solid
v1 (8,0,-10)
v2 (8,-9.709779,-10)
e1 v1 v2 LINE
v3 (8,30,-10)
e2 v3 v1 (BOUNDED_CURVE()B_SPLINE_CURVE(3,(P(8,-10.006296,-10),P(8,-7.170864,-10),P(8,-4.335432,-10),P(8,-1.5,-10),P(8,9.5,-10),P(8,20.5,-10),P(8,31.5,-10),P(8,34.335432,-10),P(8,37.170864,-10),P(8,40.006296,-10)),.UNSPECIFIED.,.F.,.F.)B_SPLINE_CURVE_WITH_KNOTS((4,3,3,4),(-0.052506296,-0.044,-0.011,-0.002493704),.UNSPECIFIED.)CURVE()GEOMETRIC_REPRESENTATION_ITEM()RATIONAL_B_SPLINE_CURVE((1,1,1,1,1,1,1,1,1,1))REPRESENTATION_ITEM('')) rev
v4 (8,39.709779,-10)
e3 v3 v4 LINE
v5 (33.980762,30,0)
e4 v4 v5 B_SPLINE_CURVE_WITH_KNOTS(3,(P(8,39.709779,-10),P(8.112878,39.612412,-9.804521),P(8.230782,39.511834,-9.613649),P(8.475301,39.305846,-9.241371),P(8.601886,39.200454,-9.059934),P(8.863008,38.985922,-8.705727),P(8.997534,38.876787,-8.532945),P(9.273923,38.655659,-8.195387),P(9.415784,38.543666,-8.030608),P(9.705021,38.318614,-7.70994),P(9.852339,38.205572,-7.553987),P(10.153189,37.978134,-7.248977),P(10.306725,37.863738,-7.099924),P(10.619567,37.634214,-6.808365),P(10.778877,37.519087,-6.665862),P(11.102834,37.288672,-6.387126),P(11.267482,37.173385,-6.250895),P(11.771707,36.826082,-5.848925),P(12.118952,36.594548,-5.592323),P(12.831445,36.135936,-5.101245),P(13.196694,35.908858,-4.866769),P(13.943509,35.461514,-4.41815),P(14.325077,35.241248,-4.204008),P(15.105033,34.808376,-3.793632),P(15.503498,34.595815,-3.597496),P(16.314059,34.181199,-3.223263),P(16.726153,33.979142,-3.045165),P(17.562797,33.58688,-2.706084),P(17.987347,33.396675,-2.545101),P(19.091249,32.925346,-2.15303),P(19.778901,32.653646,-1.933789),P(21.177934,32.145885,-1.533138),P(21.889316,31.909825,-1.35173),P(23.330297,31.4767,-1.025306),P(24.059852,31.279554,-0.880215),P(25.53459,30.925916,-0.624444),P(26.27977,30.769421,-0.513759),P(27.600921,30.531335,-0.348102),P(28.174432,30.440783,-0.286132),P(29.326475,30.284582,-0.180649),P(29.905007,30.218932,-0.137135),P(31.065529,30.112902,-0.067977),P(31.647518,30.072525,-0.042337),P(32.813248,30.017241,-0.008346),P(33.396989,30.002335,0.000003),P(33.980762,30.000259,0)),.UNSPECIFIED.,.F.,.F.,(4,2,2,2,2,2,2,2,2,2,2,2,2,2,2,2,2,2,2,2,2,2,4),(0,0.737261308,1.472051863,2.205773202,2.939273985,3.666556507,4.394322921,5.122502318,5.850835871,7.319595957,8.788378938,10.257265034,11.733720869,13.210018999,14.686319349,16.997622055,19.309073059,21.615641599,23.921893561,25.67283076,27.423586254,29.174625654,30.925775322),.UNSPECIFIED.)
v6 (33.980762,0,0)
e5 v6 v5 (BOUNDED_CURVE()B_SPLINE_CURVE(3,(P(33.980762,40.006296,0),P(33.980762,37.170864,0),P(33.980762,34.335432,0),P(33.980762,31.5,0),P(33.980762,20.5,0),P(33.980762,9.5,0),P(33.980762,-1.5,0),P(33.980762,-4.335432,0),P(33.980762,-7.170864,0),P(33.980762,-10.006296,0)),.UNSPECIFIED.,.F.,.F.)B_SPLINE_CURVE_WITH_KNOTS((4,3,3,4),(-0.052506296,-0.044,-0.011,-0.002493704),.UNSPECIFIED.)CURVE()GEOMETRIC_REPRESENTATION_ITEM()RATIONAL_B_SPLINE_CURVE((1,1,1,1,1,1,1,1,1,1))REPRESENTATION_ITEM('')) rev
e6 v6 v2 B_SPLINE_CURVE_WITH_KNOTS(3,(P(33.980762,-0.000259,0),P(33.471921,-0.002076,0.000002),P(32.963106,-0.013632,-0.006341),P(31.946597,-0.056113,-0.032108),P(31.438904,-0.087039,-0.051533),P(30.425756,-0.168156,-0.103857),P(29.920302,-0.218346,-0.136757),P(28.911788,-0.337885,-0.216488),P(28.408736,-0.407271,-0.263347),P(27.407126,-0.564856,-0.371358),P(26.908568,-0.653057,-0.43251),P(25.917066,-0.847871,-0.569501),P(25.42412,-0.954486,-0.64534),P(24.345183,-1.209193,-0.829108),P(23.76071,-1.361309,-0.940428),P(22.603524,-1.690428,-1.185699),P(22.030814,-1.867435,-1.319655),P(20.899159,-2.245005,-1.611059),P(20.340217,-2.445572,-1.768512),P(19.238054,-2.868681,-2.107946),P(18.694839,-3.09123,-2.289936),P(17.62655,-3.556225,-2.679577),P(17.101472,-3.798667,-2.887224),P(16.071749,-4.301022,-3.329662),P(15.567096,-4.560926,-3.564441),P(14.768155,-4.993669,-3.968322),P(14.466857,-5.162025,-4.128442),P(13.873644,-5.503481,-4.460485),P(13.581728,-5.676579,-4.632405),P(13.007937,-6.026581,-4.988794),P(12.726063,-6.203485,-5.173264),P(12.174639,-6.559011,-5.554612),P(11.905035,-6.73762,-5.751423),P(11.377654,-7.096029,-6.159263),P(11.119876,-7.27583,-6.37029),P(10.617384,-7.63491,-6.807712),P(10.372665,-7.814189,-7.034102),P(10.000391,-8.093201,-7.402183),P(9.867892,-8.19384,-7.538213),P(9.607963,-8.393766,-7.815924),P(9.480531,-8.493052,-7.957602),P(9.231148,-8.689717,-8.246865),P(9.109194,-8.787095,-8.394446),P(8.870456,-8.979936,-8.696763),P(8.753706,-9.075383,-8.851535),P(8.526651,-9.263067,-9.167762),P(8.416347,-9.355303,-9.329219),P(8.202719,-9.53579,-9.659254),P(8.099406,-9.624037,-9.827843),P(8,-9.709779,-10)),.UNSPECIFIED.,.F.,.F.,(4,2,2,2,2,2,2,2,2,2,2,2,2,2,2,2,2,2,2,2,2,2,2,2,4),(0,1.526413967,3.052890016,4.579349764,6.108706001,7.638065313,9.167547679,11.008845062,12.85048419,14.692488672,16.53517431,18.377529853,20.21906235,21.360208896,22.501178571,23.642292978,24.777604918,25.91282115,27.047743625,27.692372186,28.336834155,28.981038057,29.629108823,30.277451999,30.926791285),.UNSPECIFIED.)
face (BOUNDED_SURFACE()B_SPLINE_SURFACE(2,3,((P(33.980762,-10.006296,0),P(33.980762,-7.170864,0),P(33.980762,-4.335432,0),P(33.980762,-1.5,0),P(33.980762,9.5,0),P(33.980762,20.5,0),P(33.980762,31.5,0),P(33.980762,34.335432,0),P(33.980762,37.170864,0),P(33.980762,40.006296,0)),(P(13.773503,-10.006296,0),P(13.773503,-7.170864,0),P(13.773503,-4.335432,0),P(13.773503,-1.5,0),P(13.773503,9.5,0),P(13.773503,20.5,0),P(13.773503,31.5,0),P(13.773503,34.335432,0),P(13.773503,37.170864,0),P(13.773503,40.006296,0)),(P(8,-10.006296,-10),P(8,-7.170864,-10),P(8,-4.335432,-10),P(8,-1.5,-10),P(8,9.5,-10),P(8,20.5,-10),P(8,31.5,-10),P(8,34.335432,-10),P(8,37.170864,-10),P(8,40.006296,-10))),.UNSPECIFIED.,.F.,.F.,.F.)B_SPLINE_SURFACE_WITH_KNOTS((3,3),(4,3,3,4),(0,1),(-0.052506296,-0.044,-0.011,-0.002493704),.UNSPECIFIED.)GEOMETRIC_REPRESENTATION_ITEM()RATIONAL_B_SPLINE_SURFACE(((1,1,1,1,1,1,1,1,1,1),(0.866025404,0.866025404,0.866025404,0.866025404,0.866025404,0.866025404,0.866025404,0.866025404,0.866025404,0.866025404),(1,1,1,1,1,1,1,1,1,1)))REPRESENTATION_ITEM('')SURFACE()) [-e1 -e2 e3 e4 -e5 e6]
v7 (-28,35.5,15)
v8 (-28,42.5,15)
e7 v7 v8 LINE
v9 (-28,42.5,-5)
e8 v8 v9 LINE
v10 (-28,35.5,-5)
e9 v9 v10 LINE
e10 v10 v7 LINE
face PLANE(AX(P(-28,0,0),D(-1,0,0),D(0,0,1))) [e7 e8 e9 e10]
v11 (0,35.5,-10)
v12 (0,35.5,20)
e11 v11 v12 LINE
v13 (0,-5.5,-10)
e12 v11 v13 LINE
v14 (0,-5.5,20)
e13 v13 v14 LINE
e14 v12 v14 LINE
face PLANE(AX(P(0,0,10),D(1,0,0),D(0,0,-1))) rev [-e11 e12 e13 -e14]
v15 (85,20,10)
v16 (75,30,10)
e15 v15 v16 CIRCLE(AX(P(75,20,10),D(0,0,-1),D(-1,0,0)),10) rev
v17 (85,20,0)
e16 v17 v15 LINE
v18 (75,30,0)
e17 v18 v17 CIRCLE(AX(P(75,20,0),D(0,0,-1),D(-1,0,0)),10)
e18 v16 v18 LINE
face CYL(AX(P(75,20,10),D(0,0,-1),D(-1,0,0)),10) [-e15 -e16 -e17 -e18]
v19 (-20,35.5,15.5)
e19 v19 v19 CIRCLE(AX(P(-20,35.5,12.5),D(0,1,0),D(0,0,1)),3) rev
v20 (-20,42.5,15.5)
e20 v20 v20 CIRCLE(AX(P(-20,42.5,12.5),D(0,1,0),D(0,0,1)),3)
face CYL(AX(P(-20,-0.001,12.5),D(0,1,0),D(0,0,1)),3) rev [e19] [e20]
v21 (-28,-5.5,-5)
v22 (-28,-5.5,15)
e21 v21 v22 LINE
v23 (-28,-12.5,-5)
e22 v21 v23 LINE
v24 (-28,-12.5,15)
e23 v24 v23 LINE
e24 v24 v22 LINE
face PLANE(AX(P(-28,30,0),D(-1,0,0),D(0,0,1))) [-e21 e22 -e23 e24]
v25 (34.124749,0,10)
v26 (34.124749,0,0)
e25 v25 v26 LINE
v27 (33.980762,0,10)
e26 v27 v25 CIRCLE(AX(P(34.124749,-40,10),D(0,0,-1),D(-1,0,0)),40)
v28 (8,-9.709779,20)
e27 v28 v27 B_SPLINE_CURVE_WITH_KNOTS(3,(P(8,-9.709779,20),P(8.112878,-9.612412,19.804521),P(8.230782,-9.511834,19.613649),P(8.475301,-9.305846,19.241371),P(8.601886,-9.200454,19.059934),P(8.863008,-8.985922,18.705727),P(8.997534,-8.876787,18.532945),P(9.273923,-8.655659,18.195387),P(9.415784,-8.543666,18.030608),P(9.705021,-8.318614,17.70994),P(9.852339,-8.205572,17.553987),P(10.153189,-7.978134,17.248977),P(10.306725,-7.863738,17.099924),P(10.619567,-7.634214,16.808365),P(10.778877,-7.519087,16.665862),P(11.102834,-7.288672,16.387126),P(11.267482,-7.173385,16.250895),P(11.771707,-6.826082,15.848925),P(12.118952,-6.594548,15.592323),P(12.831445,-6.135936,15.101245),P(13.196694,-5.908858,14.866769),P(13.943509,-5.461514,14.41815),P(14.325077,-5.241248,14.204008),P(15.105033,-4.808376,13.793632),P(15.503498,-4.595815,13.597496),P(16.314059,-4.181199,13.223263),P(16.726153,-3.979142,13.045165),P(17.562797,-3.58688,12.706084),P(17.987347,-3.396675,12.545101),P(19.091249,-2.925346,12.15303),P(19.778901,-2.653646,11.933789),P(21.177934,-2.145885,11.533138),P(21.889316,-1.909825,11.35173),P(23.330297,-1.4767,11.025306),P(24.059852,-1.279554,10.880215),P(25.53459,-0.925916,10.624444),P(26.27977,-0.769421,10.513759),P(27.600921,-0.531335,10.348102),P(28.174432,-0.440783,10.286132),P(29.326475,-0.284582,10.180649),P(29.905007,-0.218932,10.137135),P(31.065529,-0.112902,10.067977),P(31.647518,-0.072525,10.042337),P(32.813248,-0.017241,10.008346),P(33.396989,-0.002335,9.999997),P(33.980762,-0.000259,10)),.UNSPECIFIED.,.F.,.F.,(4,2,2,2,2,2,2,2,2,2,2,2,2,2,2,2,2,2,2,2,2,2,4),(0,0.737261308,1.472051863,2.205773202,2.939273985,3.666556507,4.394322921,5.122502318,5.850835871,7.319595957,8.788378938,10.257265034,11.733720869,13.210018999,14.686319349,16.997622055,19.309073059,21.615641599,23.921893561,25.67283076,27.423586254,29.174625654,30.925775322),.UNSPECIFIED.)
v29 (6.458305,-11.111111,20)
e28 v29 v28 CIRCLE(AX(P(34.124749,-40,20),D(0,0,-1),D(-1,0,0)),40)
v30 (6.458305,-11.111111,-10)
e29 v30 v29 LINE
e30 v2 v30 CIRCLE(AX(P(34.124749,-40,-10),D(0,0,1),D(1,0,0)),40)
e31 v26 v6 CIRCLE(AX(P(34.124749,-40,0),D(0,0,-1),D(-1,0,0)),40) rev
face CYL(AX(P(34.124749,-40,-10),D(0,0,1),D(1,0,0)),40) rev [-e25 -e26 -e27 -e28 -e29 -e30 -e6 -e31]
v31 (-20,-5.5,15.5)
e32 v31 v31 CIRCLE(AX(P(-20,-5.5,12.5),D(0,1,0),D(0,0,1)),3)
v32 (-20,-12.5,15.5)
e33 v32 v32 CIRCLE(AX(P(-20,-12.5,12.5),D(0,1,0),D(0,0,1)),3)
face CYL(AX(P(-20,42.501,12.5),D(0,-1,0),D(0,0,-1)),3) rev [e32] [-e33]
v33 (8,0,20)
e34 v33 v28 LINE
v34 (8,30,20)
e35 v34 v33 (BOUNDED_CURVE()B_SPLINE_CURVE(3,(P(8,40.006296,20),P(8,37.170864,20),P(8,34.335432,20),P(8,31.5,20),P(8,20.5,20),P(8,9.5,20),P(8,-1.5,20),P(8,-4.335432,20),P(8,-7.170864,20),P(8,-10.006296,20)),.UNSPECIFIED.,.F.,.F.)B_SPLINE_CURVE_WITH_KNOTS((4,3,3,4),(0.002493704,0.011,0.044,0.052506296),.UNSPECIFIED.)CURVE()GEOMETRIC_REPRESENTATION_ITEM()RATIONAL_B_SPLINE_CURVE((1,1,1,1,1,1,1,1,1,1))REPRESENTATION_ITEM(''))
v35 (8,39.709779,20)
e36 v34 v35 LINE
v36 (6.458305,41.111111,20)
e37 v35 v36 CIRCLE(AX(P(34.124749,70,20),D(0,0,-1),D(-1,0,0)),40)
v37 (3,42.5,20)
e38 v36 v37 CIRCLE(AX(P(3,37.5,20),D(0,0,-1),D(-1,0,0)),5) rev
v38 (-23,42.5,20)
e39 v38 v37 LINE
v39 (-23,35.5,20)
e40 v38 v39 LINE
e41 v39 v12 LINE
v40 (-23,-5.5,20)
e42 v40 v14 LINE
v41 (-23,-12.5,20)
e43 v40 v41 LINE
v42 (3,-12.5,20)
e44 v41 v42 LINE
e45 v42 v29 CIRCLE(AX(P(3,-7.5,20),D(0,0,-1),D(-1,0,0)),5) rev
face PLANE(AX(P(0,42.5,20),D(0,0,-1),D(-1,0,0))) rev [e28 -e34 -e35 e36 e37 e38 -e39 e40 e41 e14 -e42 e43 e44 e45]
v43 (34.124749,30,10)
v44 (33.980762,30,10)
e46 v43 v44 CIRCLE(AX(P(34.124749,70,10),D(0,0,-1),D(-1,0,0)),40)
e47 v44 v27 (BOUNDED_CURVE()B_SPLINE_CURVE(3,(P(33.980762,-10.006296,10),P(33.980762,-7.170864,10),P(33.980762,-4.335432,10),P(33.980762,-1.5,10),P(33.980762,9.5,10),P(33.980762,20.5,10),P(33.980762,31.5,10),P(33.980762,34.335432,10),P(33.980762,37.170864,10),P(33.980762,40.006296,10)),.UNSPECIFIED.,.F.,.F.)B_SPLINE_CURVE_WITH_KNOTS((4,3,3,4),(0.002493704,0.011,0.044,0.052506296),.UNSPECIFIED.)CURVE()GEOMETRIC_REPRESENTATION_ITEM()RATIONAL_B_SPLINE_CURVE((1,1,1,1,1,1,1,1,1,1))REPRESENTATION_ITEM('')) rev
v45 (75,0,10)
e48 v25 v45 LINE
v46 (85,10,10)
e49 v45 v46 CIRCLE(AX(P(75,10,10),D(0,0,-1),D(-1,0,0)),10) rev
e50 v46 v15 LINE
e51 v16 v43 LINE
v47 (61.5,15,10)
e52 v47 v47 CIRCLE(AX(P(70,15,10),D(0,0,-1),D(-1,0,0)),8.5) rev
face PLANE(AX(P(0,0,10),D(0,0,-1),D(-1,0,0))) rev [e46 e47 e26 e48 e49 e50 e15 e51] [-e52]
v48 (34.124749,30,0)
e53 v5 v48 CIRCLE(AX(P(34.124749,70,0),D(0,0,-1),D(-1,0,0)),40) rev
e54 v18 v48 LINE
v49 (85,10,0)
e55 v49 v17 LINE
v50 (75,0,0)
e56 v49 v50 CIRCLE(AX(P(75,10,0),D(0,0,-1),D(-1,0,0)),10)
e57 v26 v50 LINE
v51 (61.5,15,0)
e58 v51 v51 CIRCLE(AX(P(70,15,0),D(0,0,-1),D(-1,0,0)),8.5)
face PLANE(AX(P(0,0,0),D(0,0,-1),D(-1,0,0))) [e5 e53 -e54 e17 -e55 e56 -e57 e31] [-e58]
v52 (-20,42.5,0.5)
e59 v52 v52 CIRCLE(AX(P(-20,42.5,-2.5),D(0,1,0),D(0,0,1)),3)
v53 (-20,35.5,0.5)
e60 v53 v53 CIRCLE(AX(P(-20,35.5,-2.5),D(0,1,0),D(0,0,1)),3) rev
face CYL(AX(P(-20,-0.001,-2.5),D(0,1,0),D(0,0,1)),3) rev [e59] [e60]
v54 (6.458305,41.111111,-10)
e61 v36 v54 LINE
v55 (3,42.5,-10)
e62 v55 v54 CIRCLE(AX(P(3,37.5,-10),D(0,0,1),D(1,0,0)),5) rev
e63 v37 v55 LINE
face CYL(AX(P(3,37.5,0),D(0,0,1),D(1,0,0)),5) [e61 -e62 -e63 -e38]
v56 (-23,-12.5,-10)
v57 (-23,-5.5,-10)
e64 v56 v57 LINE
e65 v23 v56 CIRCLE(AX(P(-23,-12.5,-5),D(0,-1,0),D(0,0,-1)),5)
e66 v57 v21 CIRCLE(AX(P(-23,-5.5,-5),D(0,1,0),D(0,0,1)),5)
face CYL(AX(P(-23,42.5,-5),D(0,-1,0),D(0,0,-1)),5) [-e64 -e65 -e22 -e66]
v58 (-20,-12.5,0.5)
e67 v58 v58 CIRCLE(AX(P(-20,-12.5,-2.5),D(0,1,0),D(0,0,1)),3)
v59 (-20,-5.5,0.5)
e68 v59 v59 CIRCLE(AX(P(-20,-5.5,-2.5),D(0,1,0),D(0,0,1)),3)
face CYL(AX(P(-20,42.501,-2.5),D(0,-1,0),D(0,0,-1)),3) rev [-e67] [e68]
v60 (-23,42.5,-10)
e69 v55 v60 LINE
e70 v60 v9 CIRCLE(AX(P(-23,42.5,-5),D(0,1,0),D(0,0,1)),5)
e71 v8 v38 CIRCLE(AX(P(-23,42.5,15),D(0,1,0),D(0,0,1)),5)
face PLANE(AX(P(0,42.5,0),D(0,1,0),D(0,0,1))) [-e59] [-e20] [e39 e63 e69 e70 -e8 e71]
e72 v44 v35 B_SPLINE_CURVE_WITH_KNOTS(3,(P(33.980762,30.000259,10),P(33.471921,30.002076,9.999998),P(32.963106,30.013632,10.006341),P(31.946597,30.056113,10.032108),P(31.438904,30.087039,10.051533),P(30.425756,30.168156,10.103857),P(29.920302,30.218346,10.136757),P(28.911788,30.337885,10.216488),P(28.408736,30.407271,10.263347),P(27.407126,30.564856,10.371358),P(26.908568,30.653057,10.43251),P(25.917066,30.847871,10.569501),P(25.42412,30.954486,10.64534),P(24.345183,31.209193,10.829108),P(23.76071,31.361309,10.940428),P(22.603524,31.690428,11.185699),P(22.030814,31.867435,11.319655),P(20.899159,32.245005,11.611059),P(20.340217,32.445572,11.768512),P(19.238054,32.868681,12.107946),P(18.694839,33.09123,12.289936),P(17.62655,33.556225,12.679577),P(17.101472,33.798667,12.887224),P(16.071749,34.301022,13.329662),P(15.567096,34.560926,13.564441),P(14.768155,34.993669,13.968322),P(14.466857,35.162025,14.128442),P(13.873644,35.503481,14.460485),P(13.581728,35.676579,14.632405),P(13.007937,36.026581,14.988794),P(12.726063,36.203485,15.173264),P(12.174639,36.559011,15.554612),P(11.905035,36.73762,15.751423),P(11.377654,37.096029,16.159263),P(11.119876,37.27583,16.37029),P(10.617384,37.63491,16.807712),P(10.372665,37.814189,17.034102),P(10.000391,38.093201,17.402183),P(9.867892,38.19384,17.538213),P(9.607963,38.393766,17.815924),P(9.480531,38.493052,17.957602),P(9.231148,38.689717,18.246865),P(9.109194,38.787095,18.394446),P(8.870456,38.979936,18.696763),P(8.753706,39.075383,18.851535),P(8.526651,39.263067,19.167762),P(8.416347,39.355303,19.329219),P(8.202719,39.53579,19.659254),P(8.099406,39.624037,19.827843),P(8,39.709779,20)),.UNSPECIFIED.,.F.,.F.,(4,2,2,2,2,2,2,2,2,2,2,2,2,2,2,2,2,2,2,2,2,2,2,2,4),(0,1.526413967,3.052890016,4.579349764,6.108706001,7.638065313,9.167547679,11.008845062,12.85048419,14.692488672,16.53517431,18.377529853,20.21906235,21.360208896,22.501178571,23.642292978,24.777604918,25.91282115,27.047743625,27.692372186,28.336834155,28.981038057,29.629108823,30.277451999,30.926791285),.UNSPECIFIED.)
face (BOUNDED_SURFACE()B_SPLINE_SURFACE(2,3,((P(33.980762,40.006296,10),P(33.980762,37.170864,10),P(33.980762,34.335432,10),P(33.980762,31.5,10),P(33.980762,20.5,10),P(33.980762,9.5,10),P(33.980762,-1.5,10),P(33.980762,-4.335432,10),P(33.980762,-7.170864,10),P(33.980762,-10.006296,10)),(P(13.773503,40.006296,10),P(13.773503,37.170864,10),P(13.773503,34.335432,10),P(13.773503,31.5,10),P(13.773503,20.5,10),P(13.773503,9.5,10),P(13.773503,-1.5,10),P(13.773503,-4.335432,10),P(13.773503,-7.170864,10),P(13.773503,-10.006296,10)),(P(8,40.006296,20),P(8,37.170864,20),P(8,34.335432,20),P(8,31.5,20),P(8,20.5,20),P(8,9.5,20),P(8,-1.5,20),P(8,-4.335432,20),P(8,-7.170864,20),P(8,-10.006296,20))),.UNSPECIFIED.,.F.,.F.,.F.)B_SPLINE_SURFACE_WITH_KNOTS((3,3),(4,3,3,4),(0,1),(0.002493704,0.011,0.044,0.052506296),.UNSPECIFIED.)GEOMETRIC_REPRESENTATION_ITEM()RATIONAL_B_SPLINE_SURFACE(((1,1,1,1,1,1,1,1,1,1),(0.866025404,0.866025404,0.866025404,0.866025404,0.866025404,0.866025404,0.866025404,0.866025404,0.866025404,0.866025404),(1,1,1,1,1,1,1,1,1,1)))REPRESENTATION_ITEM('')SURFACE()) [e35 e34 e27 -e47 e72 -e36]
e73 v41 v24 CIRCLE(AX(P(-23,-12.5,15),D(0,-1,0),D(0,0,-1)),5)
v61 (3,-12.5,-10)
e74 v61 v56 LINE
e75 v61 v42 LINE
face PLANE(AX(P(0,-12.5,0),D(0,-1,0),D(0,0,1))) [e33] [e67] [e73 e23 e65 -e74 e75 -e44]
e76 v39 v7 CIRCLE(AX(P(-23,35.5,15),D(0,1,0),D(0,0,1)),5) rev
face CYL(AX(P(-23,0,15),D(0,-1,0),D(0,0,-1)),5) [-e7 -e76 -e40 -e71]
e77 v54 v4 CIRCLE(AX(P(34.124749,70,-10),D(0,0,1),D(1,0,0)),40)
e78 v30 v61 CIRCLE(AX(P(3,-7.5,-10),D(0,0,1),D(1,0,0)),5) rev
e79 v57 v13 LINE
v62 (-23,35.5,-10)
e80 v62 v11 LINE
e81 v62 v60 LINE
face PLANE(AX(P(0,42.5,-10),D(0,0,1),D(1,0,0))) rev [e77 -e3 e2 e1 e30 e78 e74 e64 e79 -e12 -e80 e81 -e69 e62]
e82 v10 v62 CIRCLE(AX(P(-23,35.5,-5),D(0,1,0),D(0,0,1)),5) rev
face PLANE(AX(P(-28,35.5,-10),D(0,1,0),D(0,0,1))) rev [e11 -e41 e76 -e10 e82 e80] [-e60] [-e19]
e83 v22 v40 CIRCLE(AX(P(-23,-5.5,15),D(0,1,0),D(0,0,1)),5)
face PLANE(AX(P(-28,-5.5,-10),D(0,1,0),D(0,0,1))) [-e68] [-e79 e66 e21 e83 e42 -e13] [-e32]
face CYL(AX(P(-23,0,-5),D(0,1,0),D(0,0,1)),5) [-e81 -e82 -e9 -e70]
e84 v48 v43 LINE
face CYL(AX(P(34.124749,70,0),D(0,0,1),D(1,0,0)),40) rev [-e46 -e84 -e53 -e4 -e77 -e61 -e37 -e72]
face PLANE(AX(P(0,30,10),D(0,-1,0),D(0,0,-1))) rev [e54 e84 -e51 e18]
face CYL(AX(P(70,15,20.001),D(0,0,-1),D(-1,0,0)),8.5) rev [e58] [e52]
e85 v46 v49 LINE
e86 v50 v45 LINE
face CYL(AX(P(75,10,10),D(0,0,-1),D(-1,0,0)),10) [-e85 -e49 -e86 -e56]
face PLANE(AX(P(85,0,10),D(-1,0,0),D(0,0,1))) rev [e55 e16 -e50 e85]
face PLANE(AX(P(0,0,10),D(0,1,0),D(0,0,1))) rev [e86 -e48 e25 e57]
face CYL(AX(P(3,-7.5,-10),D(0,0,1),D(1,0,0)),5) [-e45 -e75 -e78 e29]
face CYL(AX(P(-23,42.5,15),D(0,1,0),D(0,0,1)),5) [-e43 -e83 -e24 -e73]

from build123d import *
from build123d.topology import SkipClean

# Parameters (mm, degrees)
SKETCH_1_W             = 85
SKETCH_1_H             = 30
EXTRUDE_1_DEPTH        = 10
EXTRUDE_2_DEPTH        = 10
EXTRUDE_2_DEPTH_BACK   = 20
SKETCH_3_W             = 8
SKETCH_3_H             = 30
SKETCH_2_R             = 8.5
CUT_EXTRUDE_1_DEPTH    = 10
SKETCH_5_W             = 8
SKETCH_5_H             = 30
EXTRUDE_3_DEPTH        = 12.5
SKETCH_6_W             = 30
SKETCH_6_H             = 7
EXTRUDE_4_DEPTH        = 28
CUT_EXTRUDE_2_REACH    = 99.115
SKETCH_7_R             = 3
FILLET_1_R             = 5
FILLET_1_OF_MIRROR_1_R = 5
FILLET_2_DEPTH         = 30
FILLET_3_DEPTH         = 30
FILLET_4_DEPTH         = 10
FILLET_START           = -9.709779072
FILLET_4_2_DEPTH       = 49.419558144
FILLET_START_2         = -11
FILLET_4_3_DEPTH       = 32
FILLET_START_3         = -10
FILLET_4_4_DEPTH       = 30
FILLET_6_R             = 10


with BuildPart() as part:
    # 草图1 → 凸台-拉伸1 (new body)
    with BuildSketch(Plane.XY):
        with Locations((42.5, 15)):
            Rectangle(SKETCH_1_W, SKETCH_1_H)
    extrude(amount=EXTRUDE_1_DEPTH)

    # 草图2 → 切除-拉伸1 (cut)
    with BuildSketch(Plane(origin=(0, 0, 0), x_dir=(-1, 0, 0), z_dir=(0, 0, -1))):
        with Locations((-70, 15)):
            Circle(SKETCH_2_R)
    extrude(amount=-CUT_EXTRUDE_1_DEPTH, mode=Mode.SUBTRACT)



with BuildPart() as body_2:
    # 草图3 → 凸台-拉伸2 (new, two sides: drawn at the far end of the back side and taken through both)
    with BuildSketch(Plane.XY.offset(10).offset(-EXTRUDE_2_DEPTH_BACK)):
        with Locations((4, 15)):
            Rectangle(SKETCH_3_W, SKETCH_3_H)
    extrude(amount=EXTRUDE_2_DEPTH + EXTRUDE_2_DEPTH_BACK)


with BuildPart() as part_1:
    add(part.part)

    add(body_2.part)  # 凸台-拉伸3 merges body 2
    # 草图5 → 凸台-拉伸3 (add)
    with BuildSketch(Plane(origin=(0, 30, 0), x_dir=(1, 0, 0), z_dir=(0, 1, 0))):
        with Locations((4, -5)):
            Rectangle(SKETCH_5_W, SKETCH_5_H)
    extrude_3 = extrude(amount=EXTRUDE_3_DEPTH)

    # 草图6 → 凸台-拉伸4 (add)
    with BuildSketch(Plane.ZY):
        with Locations((5, 39)):
            Rectangle(SKETCH_6_W, SKETCH_6_H)
    extrude_4 = extrude(amount=EXTRUDE_4_DEPTH)

    # 草图7 → 切除-拉伸2 (cut, up to next)
    with BuildSketch(Plane(origin=(0, 42.5, 0), x_dir=(1, 0, 0), z_dir=(0, 1, 0)), mode=Mode.PRIVATE) as cut_extrude_2_sk1:
        with Locations(Location((-20, 2.5, 0), (0, 0, 270))):
            Circle(SKETCH_7_R)
    cut_extrude_2_tool1 = extrude(cut_extrude_2_sk1.sketch, amount=-CUT_EXTRUDE_2_REACH, mode=Mode.PRIVATE) & part_1.part
    # 草图7 → 切除-拉伸2 (cut, up to next)
    with BuildSketch(Plane(origin=(0, 42.5, 0), x_dir=(1, 0, 0), z_dir=(0, 1, 0)), mode=Mode.PRIVATE) as cut_extrude_2_sk2:
        with Locations(Location((-20, -12.5, 0), (0, 0, 270))):
            Circle(SKETCH_7_R)
    cut_extrude_2_tool2 = extrude(cut_extrude_2_sk2.sketch, amount=-CUT_EXTRUDE_2_REACH, mode=Mode.PRIVATE) & part_1.part
    cut_extrude_2_1 = cut_extrude_2_tool1.solids().sort_by_distance((-20, 42.5, -2.5))[0]
    add(cut_extrude_2_1, mode=Mode.SUBTRACT)
    cut_extrude_2_2 = cut_extrude_2_tool2.solids().sort_by_distance((-20, 42.5, 12.5))[0]
    add(cut_extrude_2_2, mode=Mode.SUBTRACT)
    cut_extrude_2 = cut_extrude_2_1 + cut_extrude_2_2  # 切除-拉伸2 as one shape, for the pattern or mirror that repeats it

    # 圆角1
    fillet_1_edges = [part_1.edges().sort_by_distance(p)[0] for p in [
        (8, 42.5, 5),
        (-28, 39, -10),
        (-28, 39, 20),
    ]]
    fillet(fillet_1_edges, radius=FILLET_1_R)

    # 镜向1: 凸台-拉伸3, 凸台-拉伸4, 切除-拉伸2 across plane
    add(extrude_3.mirror(Plane.ZX.offset(15)))
    add(extrude_4.mirror(Plane.ZX.offset(15)))
    add(cut_extrude_2.mirror(Plane.ZX.offset(15)), mode=Mode.SUBTRACT)

    # 圆角1 of 镜向1
    fillet_1_of_mirror_1_edges = [part_1.edges().sort_by_distance(p)[0] for p in [
        (8, -12.5, 5),
        (-28, -9, -10),
        (-28, -9, 20),
    ]]
    fillet(fillet_1_of_mirror_1_edges, radius=FILLET_1_OF_MIRROR_1_R)

    # 圆角2: read off the stored shape, not the designer's step
    # 圆角2 outline → 圆角2 (add)
    with BuildSketch(Plane(origin=(0, 0, 0), x_dir=(1, 0, 0), z_dir=(0, 1, 0))):
        with BuildLine():
            add(Edge.make_bspline(
                [(33.980762114, -10), (13.773502692, -10), (8, -20)],
                knots=[0, 0, 0, 1, 1, 1], degree=2, weights=[1, 0.866025404, 1]))
            Line((33.980762114, -10), (8, -10))
            Line((8, -10), (8, -20))
        make_face()
    extrude(amount=FILLET_2_DEPTH)

    # 圆角3: read off the stored shape, not the designer's step
    # 圆角3 outline → 圆角3 (add)
    with BuildSketch(Plane(origin=(0, 0, 0), x_dir=(1, 0, 0), z_dir=(0, 1, 0))):
        with BuildLine():
            Line((8, 0), (33.980762114, 0))
            add(Edge.make_bspline(
                [(33.980762114, 0), (13.773502692, 0), (8, 10)],
                knots=[0, 0, 0, 1, 1, 1], degree=2, weights=[1, 0.866025404, 1]))
            Line((8, 10), (8, 0))
        make_face()
    extrude(amount=FILLET_3_DEPTH)

    # 圆角4: read off the stored shape, not the designer's step
    # 圆角4 outline → 圆角4 (add)
    with BuildSketch(Plane.XY):
        with BuildLine():
            ThreePointArc((6.458305444, -11.111111111), (19.217629145, -2.881570914), (34.124748995, 0))
            Line((34.124748995, 0), (8, 0))
            Line((8, 0), (8, -7.5))
            ThreePointArc((8, -7.5), (7.598452306, -9.463220922), (6.458305444, -11.111111111))
        make_face()
        with BuildLine():
            ThreePointArc((34.124748995, 30), (19.217629145, 32.881570914), (6.458305444, 41.111111111))
            ThreePointArc((6.458305444, 41.111111111), (7.598452306, 39.463220922), (8, 37.5))
            Line((8, 37.5), (8, 30))
            Line((8, 30), (34.124748995, 30))
        make_face()
    extrude(amount=FILLET_4_DEPTH)

    # Fillet 4 2 outline → Fillet 4 2 (add)
    with BuildSketch(Plane(origin=(0, 0, 0), x_dir=(1, 0, 0), z_dir=(0, 1, 0)).offset(FILLET_START)):
        with BuildLine():
            add(Edge.make_bspline(
                [(33.980762114, -10), (13.773502692, -10), (8, -20)],
                knots=[0, 0, 0, 1, 1, 1], degree=2, weights=[1, 0.866025404, 1]))
            Line((33.980762114, -10), (8, -10))
            Line((8, -10), (8, -20))
        make_face()
        with BuildLine():
            Line((8, 0), (33.980762114, 0))
            add(Edge.make_bspline(
                [(33.980762114, 0), (13.773502692, 0), (8, 10)],
                knots=[0, 0, 0, 1, 1, 1], degree=2, weights=[1, 0.866025404, 1]))
            Line((8, 10), (8, 0))
        make_face()
    extrude(amount=FILLET_4_2_DEPTH)

    # Fillet 4 3 outline → Fillet 4 3 (cut)
    with SkipClean():  # the faces are left unmerged after this step: merging them gives an invalid solid
        with BuildSketch(Plane.XY.offset(FILLET_START_2)):
            with BuildLine():
                Line((35, 0), (34.124748995, 0))
                ThreePointArc((34.124748995, 0), (20.189341563, -2.505941541), (7.99999995, -9.709779014))
                ThreePointArc((7.99999995, -9.709779014), (7.220027604, -10.400405968), (6.458305444, -11.111111111))
                Line((6.458305444, -11.111111111), (5, -12.507707754))
                Line((5, -12.507707754), (5, -13))
                Line((5, -13), (35, -13))
                Line((35, -13), (35, 0))
            make_face()
            with BuildLine():
                Line((34.124748995, 30), (35, 30))
                Line((35, 30), (35, 43))
                Line((35, 43), (5, 43))
                Line((5, 43), (5, 42.507707754))
                Line((5, 42.507707754), (6.458305444, 41.111111111))
                ThreePointArc((6.458305444, 41.111111111), (7.220027604, 40.400405968), (7.99999995, 39.709779014))
                ThreePointArc((7.99999995, 39.709779014), (20.189341563, 32.505941541), (34.124748995, 30))
            make_face()
        extrude(amount=FILLET_4_3_DEPTH, mode=Mode.SUBTRACT)
    add(part_1.part.scale(1), mode=Mode.REPLACE)  # the faces are merged on a copy

    # Fillet 4 4 outline → Fillet 4 4 (add)
    with BuildSketch(Plane.XY.offset(FILLET_START_3)):
        with BuildLine():
            ThreePointArc((6.458305444, -11.111111111), (7.220027604, -10.400405968), (7.99999995, -9.709779014))
            Line((7.99999995, -9.709779014), (8, -7.5))
            ThreePointArc((8, -7.5), (7.598452306, -9.463220922), (6.458305444, -11.111111111))
        make_face()
        with BuildLine():
            Line((8, 37.5), (7.99999995, 39.709779014))
            ThreePointArc((7.99999995, 39.709779014), (7.220027604, 40.400405968), (6.458305444, 41.111111111))
            ThreePointArc((6.458305444, 41.111111111), (7.598452306, 39.463220922), (8, 37.5))
        make_face()
    extrude(amount=FILLET_4_4_DEPTH)

    # 圆角6
    fillet_6_edges = [part_1.edges().sort_by_distance(p)[0] for p in [
        (85, 0, 5),
        (85, 30, 5),
    ]]
    fillet(fillet_6_edges, radius=FILLET_6_R)


solid = part_1.part
